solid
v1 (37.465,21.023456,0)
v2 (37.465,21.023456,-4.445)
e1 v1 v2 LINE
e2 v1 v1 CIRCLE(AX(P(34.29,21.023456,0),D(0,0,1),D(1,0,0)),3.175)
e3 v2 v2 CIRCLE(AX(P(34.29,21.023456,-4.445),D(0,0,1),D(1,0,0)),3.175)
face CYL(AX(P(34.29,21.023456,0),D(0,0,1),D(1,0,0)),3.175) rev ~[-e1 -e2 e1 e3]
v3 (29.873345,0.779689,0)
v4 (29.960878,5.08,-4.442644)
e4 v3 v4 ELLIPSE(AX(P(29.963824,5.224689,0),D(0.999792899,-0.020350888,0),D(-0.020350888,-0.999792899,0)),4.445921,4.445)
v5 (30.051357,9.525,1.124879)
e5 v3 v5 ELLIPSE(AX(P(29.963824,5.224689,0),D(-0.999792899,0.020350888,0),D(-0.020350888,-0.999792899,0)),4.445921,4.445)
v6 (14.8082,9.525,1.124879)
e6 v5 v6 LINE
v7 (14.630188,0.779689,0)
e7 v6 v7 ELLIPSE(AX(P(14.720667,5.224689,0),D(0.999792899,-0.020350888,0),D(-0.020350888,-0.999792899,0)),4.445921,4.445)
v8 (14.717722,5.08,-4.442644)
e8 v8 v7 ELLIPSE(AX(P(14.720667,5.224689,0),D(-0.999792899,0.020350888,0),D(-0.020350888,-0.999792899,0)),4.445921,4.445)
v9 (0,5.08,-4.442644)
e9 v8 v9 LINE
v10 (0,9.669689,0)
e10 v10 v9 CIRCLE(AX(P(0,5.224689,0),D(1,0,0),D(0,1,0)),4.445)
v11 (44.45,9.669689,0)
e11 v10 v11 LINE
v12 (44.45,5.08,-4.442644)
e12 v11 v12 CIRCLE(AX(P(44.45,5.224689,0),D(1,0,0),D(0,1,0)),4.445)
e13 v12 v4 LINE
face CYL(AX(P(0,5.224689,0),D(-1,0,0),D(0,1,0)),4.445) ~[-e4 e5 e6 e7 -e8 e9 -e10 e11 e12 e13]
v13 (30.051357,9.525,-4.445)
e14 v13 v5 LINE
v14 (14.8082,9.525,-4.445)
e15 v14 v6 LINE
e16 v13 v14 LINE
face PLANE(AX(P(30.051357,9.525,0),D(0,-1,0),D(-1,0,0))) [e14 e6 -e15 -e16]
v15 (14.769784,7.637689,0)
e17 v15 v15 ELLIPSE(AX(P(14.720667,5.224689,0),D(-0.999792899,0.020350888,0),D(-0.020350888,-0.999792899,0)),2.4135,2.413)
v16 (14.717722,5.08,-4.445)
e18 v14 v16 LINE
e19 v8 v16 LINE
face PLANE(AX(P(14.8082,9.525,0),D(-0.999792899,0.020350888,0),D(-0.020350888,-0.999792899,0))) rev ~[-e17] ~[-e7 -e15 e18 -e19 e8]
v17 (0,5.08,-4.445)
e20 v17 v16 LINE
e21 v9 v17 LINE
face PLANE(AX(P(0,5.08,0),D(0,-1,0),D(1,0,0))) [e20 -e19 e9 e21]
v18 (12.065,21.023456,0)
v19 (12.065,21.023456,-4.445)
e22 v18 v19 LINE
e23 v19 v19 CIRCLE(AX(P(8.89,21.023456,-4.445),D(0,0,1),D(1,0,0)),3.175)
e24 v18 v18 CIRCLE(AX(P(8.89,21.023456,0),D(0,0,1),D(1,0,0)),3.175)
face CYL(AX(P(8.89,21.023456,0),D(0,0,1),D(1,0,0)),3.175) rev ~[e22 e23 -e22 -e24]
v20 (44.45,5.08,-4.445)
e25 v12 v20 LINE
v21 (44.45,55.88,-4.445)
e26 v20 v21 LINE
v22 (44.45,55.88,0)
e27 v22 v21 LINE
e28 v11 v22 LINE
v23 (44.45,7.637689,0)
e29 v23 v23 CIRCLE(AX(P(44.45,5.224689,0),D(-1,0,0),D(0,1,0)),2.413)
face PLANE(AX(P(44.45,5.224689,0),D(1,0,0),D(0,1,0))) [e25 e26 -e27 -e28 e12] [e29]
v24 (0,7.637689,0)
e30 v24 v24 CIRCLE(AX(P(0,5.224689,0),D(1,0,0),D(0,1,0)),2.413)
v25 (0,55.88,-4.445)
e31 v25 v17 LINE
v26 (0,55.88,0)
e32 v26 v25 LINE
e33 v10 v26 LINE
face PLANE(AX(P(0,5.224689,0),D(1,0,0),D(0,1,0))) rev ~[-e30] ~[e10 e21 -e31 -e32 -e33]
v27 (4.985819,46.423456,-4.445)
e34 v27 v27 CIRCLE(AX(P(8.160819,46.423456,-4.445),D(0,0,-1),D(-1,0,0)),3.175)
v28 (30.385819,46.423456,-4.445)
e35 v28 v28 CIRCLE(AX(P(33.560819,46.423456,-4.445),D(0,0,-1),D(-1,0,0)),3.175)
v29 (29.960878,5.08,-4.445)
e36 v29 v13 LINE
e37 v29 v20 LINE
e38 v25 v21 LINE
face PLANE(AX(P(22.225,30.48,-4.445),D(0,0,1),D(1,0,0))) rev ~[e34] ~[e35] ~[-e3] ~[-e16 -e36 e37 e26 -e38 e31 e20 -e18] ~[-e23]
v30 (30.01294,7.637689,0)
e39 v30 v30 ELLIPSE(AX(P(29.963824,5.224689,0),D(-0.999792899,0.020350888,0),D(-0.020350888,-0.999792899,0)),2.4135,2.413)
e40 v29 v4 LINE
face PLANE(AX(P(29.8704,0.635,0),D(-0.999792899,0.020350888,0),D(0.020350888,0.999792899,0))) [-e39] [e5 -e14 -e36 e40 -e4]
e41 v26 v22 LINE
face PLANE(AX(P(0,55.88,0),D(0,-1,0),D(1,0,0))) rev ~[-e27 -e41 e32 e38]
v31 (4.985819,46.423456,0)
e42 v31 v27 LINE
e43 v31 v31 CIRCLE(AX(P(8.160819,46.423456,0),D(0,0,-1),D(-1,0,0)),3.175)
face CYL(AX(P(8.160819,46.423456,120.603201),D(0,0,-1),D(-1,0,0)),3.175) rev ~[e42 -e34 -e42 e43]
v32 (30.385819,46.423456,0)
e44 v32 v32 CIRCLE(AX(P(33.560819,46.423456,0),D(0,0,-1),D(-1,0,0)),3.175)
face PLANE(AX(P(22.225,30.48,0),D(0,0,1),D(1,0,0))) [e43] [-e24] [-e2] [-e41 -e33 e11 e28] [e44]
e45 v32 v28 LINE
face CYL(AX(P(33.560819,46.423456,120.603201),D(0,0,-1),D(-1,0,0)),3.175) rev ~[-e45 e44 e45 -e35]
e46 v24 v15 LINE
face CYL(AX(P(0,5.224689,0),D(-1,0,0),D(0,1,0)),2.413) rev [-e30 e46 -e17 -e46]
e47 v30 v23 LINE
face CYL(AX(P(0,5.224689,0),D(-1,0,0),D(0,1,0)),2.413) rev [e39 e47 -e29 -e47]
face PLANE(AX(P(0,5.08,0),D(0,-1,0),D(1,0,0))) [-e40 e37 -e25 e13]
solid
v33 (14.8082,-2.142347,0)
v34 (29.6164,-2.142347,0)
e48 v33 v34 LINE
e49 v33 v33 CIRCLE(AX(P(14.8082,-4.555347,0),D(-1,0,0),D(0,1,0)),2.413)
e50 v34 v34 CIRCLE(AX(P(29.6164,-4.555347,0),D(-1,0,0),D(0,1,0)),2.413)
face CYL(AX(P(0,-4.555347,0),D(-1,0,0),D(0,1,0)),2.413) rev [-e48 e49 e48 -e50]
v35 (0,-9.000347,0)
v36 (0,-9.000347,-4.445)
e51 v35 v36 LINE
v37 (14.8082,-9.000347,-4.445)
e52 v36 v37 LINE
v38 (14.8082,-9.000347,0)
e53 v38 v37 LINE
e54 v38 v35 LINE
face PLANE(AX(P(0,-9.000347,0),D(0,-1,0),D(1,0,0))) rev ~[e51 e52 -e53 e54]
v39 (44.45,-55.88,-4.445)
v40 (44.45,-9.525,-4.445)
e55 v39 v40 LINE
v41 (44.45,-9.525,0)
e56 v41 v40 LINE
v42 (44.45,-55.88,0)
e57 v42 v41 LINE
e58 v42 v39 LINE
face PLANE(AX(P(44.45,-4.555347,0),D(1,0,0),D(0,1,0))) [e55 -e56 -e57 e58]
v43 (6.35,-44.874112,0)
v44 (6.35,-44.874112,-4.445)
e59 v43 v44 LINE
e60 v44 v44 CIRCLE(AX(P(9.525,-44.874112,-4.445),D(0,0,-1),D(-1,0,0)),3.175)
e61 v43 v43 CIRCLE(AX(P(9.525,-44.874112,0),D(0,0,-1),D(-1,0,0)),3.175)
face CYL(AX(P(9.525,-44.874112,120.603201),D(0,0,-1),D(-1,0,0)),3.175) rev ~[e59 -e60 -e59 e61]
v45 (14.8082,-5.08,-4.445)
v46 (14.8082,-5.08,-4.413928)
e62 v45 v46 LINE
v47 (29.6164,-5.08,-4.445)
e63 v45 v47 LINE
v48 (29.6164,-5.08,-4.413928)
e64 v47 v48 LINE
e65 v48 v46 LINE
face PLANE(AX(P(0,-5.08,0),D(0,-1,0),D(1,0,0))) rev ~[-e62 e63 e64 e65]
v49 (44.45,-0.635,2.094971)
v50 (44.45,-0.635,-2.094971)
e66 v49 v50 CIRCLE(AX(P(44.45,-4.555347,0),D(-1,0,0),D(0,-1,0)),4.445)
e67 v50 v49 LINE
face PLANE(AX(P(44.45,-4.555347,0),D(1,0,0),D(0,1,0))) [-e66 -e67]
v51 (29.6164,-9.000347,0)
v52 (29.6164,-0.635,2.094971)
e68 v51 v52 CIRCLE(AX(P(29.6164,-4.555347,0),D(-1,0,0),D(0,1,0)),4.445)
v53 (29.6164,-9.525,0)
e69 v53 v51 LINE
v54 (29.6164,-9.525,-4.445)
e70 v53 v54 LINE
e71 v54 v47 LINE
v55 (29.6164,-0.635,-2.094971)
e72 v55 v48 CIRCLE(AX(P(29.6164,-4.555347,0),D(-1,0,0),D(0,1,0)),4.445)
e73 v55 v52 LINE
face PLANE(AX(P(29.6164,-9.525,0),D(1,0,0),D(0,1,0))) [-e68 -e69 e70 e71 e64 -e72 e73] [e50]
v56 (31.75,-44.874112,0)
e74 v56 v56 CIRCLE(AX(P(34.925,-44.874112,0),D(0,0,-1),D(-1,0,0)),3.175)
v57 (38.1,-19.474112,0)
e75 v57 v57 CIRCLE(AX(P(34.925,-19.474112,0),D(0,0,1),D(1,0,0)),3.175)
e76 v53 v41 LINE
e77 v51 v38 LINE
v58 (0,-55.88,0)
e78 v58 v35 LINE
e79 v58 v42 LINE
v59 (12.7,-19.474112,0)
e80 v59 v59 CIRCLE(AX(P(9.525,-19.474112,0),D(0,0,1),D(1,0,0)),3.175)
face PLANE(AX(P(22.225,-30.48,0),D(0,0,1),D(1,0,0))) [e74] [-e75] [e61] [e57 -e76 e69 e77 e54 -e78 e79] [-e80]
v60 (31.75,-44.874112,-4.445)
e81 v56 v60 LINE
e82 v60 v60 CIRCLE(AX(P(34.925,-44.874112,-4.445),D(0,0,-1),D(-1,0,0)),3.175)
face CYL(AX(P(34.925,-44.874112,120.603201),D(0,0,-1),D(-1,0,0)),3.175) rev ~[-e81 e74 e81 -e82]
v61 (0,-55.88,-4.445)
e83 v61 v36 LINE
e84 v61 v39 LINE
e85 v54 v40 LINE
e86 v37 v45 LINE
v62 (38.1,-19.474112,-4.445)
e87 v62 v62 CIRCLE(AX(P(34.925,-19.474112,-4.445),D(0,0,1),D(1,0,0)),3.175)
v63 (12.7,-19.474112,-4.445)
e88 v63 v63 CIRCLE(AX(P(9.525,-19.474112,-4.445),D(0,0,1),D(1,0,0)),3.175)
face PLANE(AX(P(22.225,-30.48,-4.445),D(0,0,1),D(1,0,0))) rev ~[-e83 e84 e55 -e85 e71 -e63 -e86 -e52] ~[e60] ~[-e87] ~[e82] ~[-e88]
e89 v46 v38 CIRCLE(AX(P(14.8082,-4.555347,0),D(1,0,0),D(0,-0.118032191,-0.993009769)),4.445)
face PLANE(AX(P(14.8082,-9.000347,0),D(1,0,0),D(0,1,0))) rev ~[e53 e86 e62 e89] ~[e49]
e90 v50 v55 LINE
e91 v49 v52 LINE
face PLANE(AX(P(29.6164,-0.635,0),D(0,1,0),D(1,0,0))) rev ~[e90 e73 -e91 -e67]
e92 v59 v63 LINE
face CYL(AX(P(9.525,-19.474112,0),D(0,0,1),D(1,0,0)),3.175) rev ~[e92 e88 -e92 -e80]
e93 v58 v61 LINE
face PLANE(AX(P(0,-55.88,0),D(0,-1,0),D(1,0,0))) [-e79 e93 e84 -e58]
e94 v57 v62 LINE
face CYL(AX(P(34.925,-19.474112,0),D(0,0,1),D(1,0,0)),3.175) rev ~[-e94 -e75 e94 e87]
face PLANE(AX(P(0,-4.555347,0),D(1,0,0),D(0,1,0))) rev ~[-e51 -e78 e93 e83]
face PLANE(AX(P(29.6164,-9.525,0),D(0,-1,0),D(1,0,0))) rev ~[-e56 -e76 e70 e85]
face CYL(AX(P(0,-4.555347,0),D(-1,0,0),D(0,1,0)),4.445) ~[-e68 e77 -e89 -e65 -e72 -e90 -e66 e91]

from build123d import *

# Parameters (mm, degrees)
F0_W           = 44.45
F0_H           = 50.8
F2_DEPTH       = 4.445
F3_DEPTH       = 4.445
F1_R           = 4.445
F4_DEPTH       = 44.45
F6_W           = 14.8082
F6_H           = 8.89
F6_W_2         = 14.859
F7_DEPTH       = 5.08
F7_DEPTH_BACK  = 5.08
F8_DEPTH       = 5.08
F8_DEPTH_BACK  = 5.08
F9_R           = 2.413
F10_DEPTH      = 44.451
F11_R          = 2.413
F12_DEPTH      = 44.451
F13_R          = 3.175
F14_DEPTH      = 4.446
F14_DEPTH_BACK = 4.446
F15_R          = 3.175
F16_DEPTH      = 4.446
F19_D          = 6.35
F20_D          = 6.35


# Not quite as in the source:
# - a feature of the source that left no trace in its solid (it failed there, or was rolled back) is left out


with BuildPart() as f2:
    # F0 (on Top) → F2 (new body)
    with BuildSketch(Plane.XY):
        with Locations((22.225, 30.48)):
            Rectangle(F0_W, F0_H)
    extrude(amount=-F2_DEPTH)

    # F1 (on Right) → F4 (join)
    with BuildSketch(Plane.YZ):
        with Locations((5.2246893756, 0)):
            Circle(F1_R)
    extrude(amount=F4_DEPTH)


with BuildPart() as f3:
    # F0 (on Top) → F3 (new body)
    with BuildSketch(Plane.XY):
        with Locations((22.225, -30.48)):
            Rectangle(F0_W, F0_H)
    extrude(amount=-F3_DEPTH)

    # F1 (on Right) → F4, piece 2 (join)
    with BuildSketch(Plane.YZ):
        with Locations((-4.5553469099, 0)):
            Circle(F1_R)
    extrude(amount=F4_DEPTH)


with BuildPart() as f2_1:
    add(f2.part)

    # F5: union F3
    add(f3.part)

    # F6 (on Top) → F7 (cut, two sides)
    with BuildSketch(Plane.XY) as f7_sk:
        with Locations((7.4041, -4.5553469099)):
            Rectangle(F6_W, F6_H)
        with Locations((37.0459, -5.08)):
            Rectangle(F6_W_2, F6_H)
    extrude(amount=-F7_DEPTH, mode=Mode.SUBTRACT)
    extrude(f7_sk.sketch, amount=F7_DEPTH_BACK, mode=Mode.SUBTRACT)

    # F6 (on Top) → F8 (cut, two sides)
    with BuildSketch(Plane.XY) as f8_sk:
        Polygon((30.0513568694, 9.525), (14.8082, 9.525), (14.6272431306, 0.635), (29.8704, 0.635), align=None)
    extrude(amount=-F8_DEPTH, mode=Mode.SUBTRACT)
    extrude(f8_sk.sketch, amount=F8_DEPTH_BACK, mode=Mode.SUBTRACT)

    # F9 (on face) → F10 (cut, through all)
    with BuildSketch(Plane.YZ):
        with Locations((-4.5553469099, 0)):
            Circle(F9_R)
    extrude(amount=F10_DEPTH, mode=Mode.SUBTRACT)

    # F11 (on face) → F12 (cut, through all)
    with BuildSketch(Plane.YZ):
        with Locations((5.2246893756, 0)):
            Circle(F11_R)
    extrude(amount=F12_DEPTH, mode=Mode.SUBTRACT)

    # F13 (on face) → F14 (cut, two sides)
    with BuildSketch(Plane.XY) as f14_sk:
        with Locations((8.89, 21.0234560072)):
            Circle(F13_R)
        with Locations((34.29, 21.0234560072)):
            Circle(F13_R)
    extrude(amount=-F14_DEPTH, mode=Mode.SUBTRACT)
    extrude(f14_sk.sketch, amount=F14_DEPTH_BACK, mode=Mode.SUBTRACT)

    # F15 (on face) → F16 (cut, through all)
    with BuildSketch(Plane.XY):
        with Locations((34.925, -19.4741119201)):
            Circle(F15_R)
        with Locations((9.525, -19.4741119201)):
            Circle(F15_R)
    extrude(amount=-F16_DEPTH, mode=Mode.SUBTRACT)

    # F19 (through all)
    with Locations(Plane.XY):
        with Locations((9.525, -44.8741119201), (34.925, -44.8741119201)):
            Hole(F19_D / 2)

    # F20 (through all)
    with Locations(Plane.XY):
        with Locations((8.1608192995, 46.4234560072), (33.5608192995, 46.4234560072)):
            Hole(F20_D / 2)


solid = f2_1.part
